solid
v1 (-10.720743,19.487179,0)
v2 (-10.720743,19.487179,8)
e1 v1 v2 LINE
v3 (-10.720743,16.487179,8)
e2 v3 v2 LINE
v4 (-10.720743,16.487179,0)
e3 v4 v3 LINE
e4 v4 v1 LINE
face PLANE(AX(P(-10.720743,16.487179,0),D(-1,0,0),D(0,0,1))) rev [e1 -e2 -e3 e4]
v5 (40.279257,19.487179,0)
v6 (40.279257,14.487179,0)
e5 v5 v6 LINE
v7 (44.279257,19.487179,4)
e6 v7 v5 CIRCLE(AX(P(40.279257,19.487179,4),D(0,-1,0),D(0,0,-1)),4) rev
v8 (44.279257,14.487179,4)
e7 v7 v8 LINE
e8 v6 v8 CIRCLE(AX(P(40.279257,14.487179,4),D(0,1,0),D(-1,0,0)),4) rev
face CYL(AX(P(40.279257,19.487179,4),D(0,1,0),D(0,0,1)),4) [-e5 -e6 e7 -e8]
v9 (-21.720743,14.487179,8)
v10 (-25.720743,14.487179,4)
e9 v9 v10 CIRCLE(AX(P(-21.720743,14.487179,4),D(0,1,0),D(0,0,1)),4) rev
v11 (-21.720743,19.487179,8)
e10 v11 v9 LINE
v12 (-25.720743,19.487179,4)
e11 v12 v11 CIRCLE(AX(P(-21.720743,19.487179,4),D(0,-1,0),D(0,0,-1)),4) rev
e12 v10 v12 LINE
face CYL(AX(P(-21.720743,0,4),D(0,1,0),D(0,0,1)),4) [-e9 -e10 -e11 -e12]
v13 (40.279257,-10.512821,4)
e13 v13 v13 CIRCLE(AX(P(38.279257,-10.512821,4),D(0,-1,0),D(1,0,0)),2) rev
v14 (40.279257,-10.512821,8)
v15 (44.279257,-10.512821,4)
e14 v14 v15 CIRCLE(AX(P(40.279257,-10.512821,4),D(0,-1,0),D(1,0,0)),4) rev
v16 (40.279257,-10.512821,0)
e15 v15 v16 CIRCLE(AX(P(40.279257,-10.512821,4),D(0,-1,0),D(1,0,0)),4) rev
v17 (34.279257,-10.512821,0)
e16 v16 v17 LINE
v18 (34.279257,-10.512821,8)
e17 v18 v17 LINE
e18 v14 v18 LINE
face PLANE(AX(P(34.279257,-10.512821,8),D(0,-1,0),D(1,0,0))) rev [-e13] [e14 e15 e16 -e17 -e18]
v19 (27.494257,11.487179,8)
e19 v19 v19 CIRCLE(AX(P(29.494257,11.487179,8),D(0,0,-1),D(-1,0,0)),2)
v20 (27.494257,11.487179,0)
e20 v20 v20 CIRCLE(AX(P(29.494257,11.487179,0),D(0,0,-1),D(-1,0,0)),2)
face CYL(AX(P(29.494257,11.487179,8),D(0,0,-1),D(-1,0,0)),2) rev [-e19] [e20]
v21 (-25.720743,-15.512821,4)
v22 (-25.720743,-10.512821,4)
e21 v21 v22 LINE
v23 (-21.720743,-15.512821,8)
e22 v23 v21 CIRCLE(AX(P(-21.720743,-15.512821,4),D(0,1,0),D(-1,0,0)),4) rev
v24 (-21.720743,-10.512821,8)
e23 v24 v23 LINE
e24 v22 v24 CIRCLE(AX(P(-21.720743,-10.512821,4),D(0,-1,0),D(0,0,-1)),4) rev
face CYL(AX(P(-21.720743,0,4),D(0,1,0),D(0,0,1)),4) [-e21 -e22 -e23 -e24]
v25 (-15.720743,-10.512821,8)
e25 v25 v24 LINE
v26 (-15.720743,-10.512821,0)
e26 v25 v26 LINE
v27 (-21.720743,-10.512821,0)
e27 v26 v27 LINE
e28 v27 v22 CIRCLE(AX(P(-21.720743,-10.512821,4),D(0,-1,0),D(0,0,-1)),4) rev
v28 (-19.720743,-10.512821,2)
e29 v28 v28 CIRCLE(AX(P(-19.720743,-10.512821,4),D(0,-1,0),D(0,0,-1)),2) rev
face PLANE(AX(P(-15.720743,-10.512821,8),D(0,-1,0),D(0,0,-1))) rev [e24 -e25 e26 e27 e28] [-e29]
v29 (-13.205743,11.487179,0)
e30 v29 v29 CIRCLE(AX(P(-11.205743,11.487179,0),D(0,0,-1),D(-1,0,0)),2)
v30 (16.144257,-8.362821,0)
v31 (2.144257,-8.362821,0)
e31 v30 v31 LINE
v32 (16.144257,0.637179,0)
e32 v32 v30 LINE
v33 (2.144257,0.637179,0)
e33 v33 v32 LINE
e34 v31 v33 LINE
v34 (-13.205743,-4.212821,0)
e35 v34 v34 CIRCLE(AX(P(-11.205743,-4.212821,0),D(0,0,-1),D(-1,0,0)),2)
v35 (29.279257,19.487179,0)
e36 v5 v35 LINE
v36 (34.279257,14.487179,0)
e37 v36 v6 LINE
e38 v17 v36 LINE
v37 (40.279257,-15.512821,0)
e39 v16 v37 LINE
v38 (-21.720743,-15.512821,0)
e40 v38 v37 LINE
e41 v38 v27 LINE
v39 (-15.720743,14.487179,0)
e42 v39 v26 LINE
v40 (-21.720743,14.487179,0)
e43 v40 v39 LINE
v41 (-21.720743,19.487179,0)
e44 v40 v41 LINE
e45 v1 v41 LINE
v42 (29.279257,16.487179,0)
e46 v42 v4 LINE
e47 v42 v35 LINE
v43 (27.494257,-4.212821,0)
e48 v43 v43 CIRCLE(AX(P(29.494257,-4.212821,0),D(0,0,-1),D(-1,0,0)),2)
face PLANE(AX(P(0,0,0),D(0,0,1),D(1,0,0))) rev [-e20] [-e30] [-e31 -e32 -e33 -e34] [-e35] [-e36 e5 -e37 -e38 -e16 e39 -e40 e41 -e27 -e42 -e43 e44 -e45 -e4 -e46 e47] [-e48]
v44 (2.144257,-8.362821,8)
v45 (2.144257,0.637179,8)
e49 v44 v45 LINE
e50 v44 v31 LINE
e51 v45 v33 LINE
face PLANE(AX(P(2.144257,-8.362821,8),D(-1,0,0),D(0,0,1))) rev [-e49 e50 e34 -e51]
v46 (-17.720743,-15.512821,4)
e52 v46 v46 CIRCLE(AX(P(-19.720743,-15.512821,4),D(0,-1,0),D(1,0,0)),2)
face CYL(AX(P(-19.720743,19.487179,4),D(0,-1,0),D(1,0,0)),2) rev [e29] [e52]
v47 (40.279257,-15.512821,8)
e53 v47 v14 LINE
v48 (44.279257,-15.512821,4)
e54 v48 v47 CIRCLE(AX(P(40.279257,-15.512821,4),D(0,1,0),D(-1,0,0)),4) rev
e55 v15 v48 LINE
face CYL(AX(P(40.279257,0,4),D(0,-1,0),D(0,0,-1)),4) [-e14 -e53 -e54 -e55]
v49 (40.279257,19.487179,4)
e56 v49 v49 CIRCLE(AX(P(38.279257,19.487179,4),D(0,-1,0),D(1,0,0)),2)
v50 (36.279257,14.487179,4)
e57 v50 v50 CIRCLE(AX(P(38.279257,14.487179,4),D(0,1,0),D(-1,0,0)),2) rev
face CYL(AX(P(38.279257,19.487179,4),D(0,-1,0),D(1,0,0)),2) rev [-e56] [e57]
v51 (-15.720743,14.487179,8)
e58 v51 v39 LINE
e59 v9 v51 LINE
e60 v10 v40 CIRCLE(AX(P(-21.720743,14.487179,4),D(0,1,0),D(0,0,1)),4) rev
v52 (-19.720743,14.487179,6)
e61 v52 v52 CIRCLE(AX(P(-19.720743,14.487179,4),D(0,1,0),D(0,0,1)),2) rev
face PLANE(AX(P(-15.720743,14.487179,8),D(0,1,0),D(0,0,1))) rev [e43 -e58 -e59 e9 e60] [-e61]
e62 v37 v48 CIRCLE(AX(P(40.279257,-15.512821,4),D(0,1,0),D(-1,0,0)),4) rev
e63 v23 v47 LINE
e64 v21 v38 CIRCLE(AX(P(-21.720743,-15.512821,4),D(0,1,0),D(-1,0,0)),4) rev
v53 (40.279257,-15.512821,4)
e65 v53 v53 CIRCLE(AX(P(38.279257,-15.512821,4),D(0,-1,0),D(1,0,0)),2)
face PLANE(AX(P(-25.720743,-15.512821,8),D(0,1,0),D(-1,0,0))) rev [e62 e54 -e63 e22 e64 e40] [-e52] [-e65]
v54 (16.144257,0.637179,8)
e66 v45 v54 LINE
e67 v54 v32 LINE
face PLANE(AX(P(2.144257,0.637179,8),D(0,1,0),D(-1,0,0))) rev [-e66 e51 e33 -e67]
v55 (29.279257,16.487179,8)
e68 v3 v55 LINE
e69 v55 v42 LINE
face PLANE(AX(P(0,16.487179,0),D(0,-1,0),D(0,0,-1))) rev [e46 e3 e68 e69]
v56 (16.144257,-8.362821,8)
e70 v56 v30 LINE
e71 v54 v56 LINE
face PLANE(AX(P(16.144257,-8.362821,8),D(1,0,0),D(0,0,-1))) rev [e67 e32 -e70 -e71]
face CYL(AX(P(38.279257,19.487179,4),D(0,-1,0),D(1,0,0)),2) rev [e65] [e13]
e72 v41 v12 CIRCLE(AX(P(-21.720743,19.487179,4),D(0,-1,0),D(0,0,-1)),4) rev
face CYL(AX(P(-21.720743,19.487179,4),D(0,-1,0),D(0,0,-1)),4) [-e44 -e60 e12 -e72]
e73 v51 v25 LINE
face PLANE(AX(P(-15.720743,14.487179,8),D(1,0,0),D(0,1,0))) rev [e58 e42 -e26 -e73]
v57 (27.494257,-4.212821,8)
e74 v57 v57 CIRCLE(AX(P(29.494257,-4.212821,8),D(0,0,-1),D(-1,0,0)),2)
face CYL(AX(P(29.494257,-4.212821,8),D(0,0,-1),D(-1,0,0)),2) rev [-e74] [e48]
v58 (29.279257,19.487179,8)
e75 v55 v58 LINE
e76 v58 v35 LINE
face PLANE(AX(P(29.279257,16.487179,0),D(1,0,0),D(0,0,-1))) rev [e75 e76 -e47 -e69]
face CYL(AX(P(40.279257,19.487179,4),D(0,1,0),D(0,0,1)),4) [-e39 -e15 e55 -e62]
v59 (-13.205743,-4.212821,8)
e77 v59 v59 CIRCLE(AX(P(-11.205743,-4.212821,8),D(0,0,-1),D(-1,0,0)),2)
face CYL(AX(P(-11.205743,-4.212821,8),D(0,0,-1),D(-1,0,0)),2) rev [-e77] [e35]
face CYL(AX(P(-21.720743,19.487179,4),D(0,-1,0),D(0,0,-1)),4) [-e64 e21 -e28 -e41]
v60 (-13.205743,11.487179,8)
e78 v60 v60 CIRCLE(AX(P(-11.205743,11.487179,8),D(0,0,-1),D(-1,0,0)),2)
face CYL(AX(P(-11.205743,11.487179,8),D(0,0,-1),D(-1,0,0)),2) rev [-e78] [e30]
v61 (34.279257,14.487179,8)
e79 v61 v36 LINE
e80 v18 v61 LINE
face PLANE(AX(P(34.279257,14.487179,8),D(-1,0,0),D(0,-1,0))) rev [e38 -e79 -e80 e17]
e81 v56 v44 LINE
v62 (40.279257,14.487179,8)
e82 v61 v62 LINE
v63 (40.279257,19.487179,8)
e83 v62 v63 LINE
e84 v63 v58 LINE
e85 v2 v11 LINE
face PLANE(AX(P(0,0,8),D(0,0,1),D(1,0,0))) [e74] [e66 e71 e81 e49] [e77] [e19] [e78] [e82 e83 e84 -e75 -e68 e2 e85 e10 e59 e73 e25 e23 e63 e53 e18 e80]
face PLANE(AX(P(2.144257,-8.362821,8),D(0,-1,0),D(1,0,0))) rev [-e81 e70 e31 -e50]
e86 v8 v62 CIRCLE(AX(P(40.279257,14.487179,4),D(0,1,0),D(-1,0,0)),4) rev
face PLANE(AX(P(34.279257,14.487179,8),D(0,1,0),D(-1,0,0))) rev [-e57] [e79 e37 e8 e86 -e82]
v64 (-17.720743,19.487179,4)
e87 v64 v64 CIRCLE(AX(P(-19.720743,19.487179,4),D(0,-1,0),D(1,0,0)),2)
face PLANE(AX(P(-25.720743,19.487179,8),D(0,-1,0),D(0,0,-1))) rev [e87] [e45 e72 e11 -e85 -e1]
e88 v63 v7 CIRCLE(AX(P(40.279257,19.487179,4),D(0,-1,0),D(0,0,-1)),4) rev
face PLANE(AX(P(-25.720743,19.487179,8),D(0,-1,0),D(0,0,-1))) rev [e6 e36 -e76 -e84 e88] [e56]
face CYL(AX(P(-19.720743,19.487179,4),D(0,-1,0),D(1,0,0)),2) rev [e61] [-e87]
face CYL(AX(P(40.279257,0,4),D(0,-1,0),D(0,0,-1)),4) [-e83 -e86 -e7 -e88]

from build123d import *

# Parameters (mm, degrees)
SKETCH1_W           = 70
SKETCH1_H           = 35
BOSS_EXTRUDE1_DEPTH = 8
FILLET3_R           = 4
SKETCH7_R           = 2
CUT_EXTRUDE4_DEPTH  = 35
SKETCH8_R           = 2
SKETCH8_W           = 14
SKETCH8_H           = 9
CUT_EXTRUDE5_DEPTH  = 50.034709858
SKETCH10_W          = 40
SKETCH10_H          = 8
CUT_EXTRUDE6_DEPTH  = 3
SKETCH12_W          = 10
SKETCH12_H          = 25
CUT_EXTRUDE7_DEPTH  = 50.034709858


with BuildPart() as part:
    # Sketch1 → Boss-Extrude1 (new body)
    with BuildSketch(Plane.XY):
        with Locations((9.279257068, 1.987179487)):
            Rectangle(SKETCH1_W, SKETCH1_H)
    extrude(amount=BOSS_EXTRUDE1_DEPTH)

    # Fillet3
    fillet3_edges = [part.edges().sort_by_distance(p)[0] for p in [
        (44.279257068, 1.987179487, 0),
        (44.279257068, 1.987179487, 8),
        (-25.720742932, 1.987179487, 0),
        (-25.720742932, 1.987179487, 8),
    ]]
    fillet(fillet3_edges, radius=FILLET3_R - 0.0001)  # a hair under: the kernel refuses the full size

    # Sketch7 → Cut-Extrude4 (cut)
    with BuildSketch(Plane.XZ.offset(15.512820513)):
        with Locations((38.279257068, 4)):
            Circle(SKETCH7_R)
        with Locations((-19.720742932, 4)):
            Circle(SKETCH7_R)
    extrude(amount=-CUT_EXTRUDE4_DEPTH, mode=Mode.SUBTRACT)

    # Sketch8 → Cut-Extrude5 (cut, through all)
    with BuildSketch(Plane(origin=(0, 0, 0), x_dir=(-1, 0, 0), z_dir=(0, 0, -1))):
        with Locations((-29.494257068, -4.212820513)):
            Circle(SKETCH8_R)
        with Locations((-29.494257068, 11.487179487)):
            Circle(SKETCH8_R)
        with Locations((11.205742932, 11.487179487)):
            Circle(SKETCH8_R)
        with Locations((11.205742932, -4.212820513)):
            Circle(SKETCH8_R)
        with Locations((-9.144257068, -3.862820513)):
            Rectangle(SKETCH8_W, SKETCH8_H)
    extrude(amount=-CUT_EXTRUDE5_DEPTH, mode=Mode.SUBTRACT)

    # Sketch10 → Cut-Extrude6 (cut)
    with BuildSketch(Plane(origin=(0, 19.487179487, 0), x_dir=(1, 0, 0), z_dir=(0, 1, 0))):
        with Locations((9.279257068, -4)):
            Rectangle(SKETCH10_W, SKETCH10_H)
    extrude(amount=-CUT_EXTRUDE6_DEPTH, mode=Mode.SUBTRACT)

    # Sketch12 → Cut-Extrude7 (cut, through all)
    with BuildSketch(Plane(origin=(0, 0, 0), x_dir=(-1, 0, 0), z_dir=(0, 0, -1))):
        with Locations((20.720742932, 1.987179487)):
            Rectangle(SKETCH12_W, SKETCH12_H)
        with Locations((-39.279257068, 1.987179487)):
            Rectangle(SKETCH12_W, SKETCH12_H)
    extrude(amount=-CUT_EXTRUDE7_DEPTH, mode=Mode.SUBTRACT)


solid = part.part
